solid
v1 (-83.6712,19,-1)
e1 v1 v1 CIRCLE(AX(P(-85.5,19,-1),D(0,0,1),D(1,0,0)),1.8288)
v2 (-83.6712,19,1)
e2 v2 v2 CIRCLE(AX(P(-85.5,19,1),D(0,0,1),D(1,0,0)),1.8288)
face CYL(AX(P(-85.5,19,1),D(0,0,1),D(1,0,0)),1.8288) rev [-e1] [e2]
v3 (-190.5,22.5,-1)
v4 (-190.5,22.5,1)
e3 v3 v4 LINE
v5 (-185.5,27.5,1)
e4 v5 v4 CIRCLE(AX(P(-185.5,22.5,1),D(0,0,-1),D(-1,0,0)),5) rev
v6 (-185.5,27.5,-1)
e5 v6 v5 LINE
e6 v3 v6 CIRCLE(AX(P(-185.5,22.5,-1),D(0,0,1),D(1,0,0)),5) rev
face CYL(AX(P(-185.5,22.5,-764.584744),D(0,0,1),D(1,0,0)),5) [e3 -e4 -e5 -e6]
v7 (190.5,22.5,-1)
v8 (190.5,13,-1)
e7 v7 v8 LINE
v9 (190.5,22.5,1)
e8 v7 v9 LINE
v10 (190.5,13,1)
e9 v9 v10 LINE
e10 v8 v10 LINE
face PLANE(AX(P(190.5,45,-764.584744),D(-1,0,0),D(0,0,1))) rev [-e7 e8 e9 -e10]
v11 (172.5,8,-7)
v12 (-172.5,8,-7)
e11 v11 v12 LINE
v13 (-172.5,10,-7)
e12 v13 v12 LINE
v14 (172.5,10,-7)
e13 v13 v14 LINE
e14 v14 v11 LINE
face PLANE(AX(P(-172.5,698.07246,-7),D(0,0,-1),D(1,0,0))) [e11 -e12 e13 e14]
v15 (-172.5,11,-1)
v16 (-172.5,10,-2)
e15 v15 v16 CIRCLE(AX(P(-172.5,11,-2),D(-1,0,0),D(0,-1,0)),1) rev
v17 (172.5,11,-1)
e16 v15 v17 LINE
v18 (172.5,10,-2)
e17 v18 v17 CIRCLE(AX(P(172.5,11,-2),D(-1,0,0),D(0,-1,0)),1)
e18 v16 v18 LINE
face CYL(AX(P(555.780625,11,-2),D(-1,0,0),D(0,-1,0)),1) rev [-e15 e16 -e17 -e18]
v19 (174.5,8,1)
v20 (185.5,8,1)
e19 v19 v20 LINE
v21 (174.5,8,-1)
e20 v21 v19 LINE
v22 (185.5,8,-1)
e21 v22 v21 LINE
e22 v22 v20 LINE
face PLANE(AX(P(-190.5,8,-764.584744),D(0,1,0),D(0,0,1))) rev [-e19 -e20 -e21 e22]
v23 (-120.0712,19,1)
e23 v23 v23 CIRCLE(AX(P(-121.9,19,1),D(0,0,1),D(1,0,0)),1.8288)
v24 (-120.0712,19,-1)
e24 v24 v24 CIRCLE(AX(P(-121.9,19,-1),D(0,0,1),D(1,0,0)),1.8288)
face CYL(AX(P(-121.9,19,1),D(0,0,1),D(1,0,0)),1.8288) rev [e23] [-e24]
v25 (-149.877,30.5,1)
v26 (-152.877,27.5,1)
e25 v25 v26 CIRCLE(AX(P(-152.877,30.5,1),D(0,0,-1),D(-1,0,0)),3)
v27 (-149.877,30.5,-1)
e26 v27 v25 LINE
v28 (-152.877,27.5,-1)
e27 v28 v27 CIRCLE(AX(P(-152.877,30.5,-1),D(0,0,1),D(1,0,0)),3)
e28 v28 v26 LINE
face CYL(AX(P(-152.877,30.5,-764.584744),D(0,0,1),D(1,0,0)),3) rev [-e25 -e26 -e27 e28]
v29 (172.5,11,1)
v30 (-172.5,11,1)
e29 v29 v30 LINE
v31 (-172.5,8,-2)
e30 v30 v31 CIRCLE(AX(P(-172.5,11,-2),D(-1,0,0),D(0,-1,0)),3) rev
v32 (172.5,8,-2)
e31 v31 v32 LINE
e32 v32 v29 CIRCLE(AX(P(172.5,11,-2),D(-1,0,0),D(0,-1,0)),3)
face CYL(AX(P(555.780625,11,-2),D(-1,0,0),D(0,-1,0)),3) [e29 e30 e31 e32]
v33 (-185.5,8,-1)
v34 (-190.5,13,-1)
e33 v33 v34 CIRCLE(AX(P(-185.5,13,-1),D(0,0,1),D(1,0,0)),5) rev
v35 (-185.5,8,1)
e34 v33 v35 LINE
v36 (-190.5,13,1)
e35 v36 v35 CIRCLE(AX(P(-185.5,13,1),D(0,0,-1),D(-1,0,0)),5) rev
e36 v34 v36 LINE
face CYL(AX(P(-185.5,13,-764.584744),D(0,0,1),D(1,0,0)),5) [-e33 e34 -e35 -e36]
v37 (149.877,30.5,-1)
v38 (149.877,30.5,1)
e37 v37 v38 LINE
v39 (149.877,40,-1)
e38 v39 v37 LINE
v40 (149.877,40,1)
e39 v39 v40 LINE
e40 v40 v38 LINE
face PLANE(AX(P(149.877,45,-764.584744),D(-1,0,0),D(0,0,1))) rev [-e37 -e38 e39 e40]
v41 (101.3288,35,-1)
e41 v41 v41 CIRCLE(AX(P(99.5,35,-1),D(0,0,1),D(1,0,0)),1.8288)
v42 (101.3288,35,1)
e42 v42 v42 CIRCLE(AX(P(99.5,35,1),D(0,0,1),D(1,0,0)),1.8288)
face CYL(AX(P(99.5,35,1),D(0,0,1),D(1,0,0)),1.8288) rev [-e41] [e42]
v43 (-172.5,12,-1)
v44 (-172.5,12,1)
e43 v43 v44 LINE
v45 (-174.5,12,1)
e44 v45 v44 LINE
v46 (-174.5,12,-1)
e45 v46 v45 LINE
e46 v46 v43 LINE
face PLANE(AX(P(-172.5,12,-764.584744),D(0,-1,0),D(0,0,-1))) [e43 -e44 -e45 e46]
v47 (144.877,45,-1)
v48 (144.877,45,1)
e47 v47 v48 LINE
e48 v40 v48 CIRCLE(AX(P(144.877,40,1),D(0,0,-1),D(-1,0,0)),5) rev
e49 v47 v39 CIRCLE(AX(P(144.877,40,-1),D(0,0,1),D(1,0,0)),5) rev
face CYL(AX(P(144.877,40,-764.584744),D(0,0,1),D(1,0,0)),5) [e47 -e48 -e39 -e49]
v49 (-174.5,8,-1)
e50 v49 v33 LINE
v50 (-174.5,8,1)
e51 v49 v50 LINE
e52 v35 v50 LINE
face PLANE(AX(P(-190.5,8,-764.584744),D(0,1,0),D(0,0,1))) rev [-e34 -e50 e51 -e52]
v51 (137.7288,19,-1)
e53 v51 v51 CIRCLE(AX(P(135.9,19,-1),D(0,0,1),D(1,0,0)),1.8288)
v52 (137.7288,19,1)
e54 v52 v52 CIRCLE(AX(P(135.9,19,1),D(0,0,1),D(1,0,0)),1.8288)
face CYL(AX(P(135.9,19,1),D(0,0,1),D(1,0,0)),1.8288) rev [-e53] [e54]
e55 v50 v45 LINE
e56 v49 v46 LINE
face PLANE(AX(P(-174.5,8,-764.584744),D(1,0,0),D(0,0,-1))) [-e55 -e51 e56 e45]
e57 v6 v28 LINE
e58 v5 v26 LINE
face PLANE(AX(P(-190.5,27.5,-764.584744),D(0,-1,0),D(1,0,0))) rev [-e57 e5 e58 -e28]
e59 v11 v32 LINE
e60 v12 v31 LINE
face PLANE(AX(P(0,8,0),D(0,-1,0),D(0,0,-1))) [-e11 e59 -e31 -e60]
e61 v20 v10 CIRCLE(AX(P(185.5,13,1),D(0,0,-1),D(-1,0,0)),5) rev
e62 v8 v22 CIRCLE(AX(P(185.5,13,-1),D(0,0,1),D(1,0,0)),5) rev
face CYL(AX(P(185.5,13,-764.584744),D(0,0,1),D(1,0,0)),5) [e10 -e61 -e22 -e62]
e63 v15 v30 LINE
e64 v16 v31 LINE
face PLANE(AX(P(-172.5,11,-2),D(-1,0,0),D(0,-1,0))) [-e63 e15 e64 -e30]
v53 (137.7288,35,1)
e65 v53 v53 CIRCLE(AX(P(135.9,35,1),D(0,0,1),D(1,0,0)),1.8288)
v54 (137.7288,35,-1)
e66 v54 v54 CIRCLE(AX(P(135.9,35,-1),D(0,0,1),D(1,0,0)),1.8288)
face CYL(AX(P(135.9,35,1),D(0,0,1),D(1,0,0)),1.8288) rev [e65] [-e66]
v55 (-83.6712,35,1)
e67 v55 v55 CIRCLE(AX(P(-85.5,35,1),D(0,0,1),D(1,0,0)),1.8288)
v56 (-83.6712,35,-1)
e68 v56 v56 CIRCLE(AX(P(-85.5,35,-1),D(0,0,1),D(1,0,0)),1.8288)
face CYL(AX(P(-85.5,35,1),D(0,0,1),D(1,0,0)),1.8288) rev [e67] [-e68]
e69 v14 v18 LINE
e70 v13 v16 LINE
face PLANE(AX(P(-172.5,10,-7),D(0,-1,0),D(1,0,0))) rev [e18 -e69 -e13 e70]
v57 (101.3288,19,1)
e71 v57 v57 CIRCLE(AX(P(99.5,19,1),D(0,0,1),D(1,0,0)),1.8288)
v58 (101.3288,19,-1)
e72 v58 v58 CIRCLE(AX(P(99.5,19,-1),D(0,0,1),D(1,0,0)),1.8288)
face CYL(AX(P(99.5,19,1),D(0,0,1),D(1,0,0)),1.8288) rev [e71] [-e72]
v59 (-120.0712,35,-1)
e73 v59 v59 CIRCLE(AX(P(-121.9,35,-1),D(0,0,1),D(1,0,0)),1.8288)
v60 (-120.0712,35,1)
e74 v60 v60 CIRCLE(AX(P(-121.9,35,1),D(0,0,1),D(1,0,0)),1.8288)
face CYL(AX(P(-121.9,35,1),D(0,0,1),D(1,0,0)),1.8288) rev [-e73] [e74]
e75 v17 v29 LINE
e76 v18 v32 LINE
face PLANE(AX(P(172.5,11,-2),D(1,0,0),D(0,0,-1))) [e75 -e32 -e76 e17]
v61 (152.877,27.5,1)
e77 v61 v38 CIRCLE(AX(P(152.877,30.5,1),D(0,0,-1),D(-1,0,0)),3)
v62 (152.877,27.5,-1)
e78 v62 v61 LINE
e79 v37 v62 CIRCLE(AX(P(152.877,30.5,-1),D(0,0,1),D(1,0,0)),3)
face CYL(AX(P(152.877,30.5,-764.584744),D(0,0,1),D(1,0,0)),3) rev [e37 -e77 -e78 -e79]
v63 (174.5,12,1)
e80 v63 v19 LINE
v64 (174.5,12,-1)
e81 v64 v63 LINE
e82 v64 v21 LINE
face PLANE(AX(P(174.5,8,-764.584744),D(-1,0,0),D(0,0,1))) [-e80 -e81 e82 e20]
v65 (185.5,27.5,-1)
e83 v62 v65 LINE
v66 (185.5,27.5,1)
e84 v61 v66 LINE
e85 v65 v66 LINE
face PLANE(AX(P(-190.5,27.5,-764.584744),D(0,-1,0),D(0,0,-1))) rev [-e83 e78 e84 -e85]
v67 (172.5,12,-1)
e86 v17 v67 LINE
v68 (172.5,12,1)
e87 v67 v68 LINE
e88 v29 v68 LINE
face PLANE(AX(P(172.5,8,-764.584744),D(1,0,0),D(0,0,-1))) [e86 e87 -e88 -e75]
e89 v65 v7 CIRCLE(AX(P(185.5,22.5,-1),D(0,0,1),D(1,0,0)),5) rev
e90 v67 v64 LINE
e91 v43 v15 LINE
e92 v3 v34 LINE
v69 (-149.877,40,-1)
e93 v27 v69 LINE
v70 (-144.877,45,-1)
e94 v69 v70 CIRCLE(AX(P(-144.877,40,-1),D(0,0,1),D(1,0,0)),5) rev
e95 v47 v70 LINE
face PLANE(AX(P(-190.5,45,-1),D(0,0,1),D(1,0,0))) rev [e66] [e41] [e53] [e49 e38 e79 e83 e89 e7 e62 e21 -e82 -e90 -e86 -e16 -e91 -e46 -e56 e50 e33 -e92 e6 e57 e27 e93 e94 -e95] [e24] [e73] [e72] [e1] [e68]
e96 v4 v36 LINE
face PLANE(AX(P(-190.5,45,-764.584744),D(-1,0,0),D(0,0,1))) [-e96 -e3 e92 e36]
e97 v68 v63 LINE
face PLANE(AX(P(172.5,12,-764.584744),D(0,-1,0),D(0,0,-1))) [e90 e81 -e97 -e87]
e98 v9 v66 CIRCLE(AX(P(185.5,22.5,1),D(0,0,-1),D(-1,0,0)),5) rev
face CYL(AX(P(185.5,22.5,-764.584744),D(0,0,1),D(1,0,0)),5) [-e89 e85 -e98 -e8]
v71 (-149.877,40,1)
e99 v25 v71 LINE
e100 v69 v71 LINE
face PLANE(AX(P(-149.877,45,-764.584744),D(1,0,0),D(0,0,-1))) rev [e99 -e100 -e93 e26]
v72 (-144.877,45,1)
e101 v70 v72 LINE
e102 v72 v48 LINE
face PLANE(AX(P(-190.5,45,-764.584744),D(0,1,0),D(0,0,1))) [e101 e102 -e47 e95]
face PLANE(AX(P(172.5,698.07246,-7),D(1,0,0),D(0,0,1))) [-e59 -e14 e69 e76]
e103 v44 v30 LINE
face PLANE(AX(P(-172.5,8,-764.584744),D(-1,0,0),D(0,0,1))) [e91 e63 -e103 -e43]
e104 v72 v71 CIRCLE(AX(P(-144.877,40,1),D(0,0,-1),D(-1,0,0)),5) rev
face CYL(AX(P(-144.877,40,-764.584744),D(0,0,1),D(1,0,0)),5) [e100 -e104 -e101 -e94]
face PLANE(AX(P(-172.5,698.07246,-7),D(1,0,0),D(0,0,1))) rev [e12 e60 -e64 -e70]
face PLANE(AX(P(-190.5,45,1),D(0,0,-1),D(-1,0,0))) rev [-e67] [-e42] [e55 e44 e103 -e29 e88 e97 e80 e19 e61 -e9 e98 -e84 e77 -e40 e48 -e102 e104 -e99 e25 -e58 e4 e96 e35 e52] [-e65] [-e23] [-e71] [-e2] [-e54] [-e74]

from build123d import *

# Parameters (mm, degrees)
BOSS_EXTRUDE1_START        = 8
SKETCH2_W                  = 381
SKETCH2_H                  = 2
BOSS_EXTRUDE1_DEPTH        = 37
SKETCH3_W                  = 345
SKETCH3_H                  = 2
BOSS_EXTRUDE2_DEPTH        = 6
SKETCH4_W                  = 40.623
SKETCH4_H                  = 17.5
CUT_EXTRUDE1_DEPTH         = 3
F_6_CLEARANCE_HOLE1_D      = 3.6576
FILLET2_R                  = 5
FILLET3_R                  = 3
SKETCH8_W                  = 2
SKETCH8_H                  = 4
CUT_EXTRUDE2_DEPTH         = 196.834751768
FLATTEN_BENDS1_START       = -7
FLATTEN_BENDS1_OUTLINE_W   = 345
FLATTEN_BENDS1_OUTLINE_H   = 2
FLATTEN_BENDS1_DEPTH       = 6
FLATTEN_BENDS1_START_2     = -1
FLATTEN_BENDS1_2_OUTLINE_W = 345
FLATTEN_BENDS1_2_OUTLINE_H = 4.701769682
FLATTEN_BENDS1_2_DEPTH     = 2
PROCESS_BENDS1_START       = -172.5
PROCESS_BENDS1_DEPTH       = 345
PROCESS_BENDS1_2_DEPTH     = 345


# Read off the part's stored shape, not the designer's step: Flatten-Bends1, Process-Bends1
with BuildPart() as part:
    # Sketch2 → Boss-Extrude1 (new body)
    with BuildSketch(Plane(origin=(0, 0, 0), x_dir=(1, 0, 0), z_dir=(0, 1, 0)).offset(BOSS_EXTRUDE1_START)):
        Rectangle(SKETCH2_W, SKETCH2_H)
    extrude(amount=BOSS_EXTRUDE1_DEPTH)

    # Sketch3 → Boss-Extrude2 (add)
    with BuildSketch(Plane(origin=(0, 0, -1), x_dir=(-1, 0, 0), z_dir=(0, 0, -1))):
        with Locations((0, 9)):
            Rectangle(SKETCH3_W, SKETCH3_H)
    extrude(amount=BOSS_EXTRUDE2_DEPTH)

    # Sketch4 → Cut-Extrude1 (cut)
    with BuildSketch(Plane.XY.offset(1)):
        with Locations((170.1885, 36.25)):
            Rectangle(SKETCH4_W, SKETCH4_H)
        with Locations((-170.1885, 36.25)):
            Rectangle(SKETCH4_W, SKETCH4_H)
    extrude(amount=-CUT_EXTRUDE1_DEPTH, mode=Mode.SUBTRACT)

    # #6 Clearance Hole1 (through all)
    with Locations(Plane.XY.offset(1)):
        with Locations((-121.9, 35), (-121.9, 19), (-85.5, 35), (-85.5, 19), (99.5, 19), (99.5, 35), (135.9, 35), (135.9, 19)):
            Hole(F_6_CLEARANCE_HOLE1_D / 2)

    # Fillet2
    fillet2_edges = [part.edges().sort_by_distance(p)[0] for p in [
        (-190.5, 27.5, 0),
        (-149.877, 45, 0),
        (190.5, 27.5, 0),
        (149.877, 45, 0),
        (-190.5, 8, 0),
        (190.5, 8, 0),
    ]]
    fillet(fillet2_edges, radius=FILLET2_R)

    # Fillet3
    fillet3_edges = [part.edges().sort_by_distance(p)[0] for p in [
        (-149.877, 27.5, 0),
        (149.877, 27.5, 0),
    ]]
    fillet(fillet3_edges, radius=FILLET3_R)

    # Sketch8 → Cut-Extrude2 (cut, through all)
    with BuildSketch(Plane(origin=(0, 0, -1), x_dir=(-1, 0, 0), z_dir=(0, 0, -1))):
        with Locations((173.5, 10)):
            Rectangle(SKETCH8_W, SKETCH8_H)
        with Locations((-173.5, 10)):
            Rectangle(SKETCH8_W, SKETCH8_H)
    extrude(amount=-CUT_EXTRUDE2_DEPTH, mode=Mode.SUBTRACT)

    # Flatten-Bends1 outline → Flatten-Bends1 (cut)
    with BuildSketch(Plane.XY.offset(FLATTEN_BENDS1_START)):
        with Locations((0, 9)):
            Rectangle(FLATTEN_BENDS1_OUTLINE_W, FLATTEN_BENDS1_OUTLINE_H)
    extrude(amount=FLATTEN_BENDS1_DEPTH, mode=Mode.SUBTRACT)

    # Flatten-Bends1 2 outline → Flatten-Bends1 2 (add)
    with BuildSketch(Plane.XY.offset(FLATTEN_BENDS1_START_2)):
        with Locations((0, 5.649115159)):
            Rectangle(FLATTEN_BENDS1_2_OUTLINE_W, FLATTEN_BENDS1_2_OUTLINE_H)
    extrude(amount=FLATTEN_BENDS1_2_DEPTH)

    # Process-Bends1 outline → Process-Bends1 (cut)
    with BuildSketch(Plane.YZ.offset(PROCESS_BENDS1_START)):
        with BuildLine():
            Line((3.298230318, -1), (8.171572875, -1))
            ThreePointArc((8.171572875, -1), (9.267949192, 0.449489743), (11, 1))
            Line((11, 1), (3.298230318, 1))
            Line((3.298230318, 1), (3.298230318, -1))
        make_face()
    extrude(amount=PROCESS_BENDS1_DEPTH, mode=Mode.SUBTRACT)

    # Process-Bends1 2 outline → Process-Bends1 2 (add)
    with BuildSketch(Plane.YZ.offset(PROCESS_BENDS1_START)):
        with BuildLine():
            Line((8, -2), (8, -7))
            Line((8, -7), (10, -7))
            Line((10, -7), (10, -2))
            ThreePointArc((10, -2), (10.292893219, -1.292893219), (11, -1))
            Line((11, -1), (8.171572875, -1))
            ThreePointArc((8.171572875, -1), (8.043204321, -1.492694064), (8, -2))
        make_face()
    extrude(amount=PROCESS_BENDS1_2_DEPTH)


solid = part.part
